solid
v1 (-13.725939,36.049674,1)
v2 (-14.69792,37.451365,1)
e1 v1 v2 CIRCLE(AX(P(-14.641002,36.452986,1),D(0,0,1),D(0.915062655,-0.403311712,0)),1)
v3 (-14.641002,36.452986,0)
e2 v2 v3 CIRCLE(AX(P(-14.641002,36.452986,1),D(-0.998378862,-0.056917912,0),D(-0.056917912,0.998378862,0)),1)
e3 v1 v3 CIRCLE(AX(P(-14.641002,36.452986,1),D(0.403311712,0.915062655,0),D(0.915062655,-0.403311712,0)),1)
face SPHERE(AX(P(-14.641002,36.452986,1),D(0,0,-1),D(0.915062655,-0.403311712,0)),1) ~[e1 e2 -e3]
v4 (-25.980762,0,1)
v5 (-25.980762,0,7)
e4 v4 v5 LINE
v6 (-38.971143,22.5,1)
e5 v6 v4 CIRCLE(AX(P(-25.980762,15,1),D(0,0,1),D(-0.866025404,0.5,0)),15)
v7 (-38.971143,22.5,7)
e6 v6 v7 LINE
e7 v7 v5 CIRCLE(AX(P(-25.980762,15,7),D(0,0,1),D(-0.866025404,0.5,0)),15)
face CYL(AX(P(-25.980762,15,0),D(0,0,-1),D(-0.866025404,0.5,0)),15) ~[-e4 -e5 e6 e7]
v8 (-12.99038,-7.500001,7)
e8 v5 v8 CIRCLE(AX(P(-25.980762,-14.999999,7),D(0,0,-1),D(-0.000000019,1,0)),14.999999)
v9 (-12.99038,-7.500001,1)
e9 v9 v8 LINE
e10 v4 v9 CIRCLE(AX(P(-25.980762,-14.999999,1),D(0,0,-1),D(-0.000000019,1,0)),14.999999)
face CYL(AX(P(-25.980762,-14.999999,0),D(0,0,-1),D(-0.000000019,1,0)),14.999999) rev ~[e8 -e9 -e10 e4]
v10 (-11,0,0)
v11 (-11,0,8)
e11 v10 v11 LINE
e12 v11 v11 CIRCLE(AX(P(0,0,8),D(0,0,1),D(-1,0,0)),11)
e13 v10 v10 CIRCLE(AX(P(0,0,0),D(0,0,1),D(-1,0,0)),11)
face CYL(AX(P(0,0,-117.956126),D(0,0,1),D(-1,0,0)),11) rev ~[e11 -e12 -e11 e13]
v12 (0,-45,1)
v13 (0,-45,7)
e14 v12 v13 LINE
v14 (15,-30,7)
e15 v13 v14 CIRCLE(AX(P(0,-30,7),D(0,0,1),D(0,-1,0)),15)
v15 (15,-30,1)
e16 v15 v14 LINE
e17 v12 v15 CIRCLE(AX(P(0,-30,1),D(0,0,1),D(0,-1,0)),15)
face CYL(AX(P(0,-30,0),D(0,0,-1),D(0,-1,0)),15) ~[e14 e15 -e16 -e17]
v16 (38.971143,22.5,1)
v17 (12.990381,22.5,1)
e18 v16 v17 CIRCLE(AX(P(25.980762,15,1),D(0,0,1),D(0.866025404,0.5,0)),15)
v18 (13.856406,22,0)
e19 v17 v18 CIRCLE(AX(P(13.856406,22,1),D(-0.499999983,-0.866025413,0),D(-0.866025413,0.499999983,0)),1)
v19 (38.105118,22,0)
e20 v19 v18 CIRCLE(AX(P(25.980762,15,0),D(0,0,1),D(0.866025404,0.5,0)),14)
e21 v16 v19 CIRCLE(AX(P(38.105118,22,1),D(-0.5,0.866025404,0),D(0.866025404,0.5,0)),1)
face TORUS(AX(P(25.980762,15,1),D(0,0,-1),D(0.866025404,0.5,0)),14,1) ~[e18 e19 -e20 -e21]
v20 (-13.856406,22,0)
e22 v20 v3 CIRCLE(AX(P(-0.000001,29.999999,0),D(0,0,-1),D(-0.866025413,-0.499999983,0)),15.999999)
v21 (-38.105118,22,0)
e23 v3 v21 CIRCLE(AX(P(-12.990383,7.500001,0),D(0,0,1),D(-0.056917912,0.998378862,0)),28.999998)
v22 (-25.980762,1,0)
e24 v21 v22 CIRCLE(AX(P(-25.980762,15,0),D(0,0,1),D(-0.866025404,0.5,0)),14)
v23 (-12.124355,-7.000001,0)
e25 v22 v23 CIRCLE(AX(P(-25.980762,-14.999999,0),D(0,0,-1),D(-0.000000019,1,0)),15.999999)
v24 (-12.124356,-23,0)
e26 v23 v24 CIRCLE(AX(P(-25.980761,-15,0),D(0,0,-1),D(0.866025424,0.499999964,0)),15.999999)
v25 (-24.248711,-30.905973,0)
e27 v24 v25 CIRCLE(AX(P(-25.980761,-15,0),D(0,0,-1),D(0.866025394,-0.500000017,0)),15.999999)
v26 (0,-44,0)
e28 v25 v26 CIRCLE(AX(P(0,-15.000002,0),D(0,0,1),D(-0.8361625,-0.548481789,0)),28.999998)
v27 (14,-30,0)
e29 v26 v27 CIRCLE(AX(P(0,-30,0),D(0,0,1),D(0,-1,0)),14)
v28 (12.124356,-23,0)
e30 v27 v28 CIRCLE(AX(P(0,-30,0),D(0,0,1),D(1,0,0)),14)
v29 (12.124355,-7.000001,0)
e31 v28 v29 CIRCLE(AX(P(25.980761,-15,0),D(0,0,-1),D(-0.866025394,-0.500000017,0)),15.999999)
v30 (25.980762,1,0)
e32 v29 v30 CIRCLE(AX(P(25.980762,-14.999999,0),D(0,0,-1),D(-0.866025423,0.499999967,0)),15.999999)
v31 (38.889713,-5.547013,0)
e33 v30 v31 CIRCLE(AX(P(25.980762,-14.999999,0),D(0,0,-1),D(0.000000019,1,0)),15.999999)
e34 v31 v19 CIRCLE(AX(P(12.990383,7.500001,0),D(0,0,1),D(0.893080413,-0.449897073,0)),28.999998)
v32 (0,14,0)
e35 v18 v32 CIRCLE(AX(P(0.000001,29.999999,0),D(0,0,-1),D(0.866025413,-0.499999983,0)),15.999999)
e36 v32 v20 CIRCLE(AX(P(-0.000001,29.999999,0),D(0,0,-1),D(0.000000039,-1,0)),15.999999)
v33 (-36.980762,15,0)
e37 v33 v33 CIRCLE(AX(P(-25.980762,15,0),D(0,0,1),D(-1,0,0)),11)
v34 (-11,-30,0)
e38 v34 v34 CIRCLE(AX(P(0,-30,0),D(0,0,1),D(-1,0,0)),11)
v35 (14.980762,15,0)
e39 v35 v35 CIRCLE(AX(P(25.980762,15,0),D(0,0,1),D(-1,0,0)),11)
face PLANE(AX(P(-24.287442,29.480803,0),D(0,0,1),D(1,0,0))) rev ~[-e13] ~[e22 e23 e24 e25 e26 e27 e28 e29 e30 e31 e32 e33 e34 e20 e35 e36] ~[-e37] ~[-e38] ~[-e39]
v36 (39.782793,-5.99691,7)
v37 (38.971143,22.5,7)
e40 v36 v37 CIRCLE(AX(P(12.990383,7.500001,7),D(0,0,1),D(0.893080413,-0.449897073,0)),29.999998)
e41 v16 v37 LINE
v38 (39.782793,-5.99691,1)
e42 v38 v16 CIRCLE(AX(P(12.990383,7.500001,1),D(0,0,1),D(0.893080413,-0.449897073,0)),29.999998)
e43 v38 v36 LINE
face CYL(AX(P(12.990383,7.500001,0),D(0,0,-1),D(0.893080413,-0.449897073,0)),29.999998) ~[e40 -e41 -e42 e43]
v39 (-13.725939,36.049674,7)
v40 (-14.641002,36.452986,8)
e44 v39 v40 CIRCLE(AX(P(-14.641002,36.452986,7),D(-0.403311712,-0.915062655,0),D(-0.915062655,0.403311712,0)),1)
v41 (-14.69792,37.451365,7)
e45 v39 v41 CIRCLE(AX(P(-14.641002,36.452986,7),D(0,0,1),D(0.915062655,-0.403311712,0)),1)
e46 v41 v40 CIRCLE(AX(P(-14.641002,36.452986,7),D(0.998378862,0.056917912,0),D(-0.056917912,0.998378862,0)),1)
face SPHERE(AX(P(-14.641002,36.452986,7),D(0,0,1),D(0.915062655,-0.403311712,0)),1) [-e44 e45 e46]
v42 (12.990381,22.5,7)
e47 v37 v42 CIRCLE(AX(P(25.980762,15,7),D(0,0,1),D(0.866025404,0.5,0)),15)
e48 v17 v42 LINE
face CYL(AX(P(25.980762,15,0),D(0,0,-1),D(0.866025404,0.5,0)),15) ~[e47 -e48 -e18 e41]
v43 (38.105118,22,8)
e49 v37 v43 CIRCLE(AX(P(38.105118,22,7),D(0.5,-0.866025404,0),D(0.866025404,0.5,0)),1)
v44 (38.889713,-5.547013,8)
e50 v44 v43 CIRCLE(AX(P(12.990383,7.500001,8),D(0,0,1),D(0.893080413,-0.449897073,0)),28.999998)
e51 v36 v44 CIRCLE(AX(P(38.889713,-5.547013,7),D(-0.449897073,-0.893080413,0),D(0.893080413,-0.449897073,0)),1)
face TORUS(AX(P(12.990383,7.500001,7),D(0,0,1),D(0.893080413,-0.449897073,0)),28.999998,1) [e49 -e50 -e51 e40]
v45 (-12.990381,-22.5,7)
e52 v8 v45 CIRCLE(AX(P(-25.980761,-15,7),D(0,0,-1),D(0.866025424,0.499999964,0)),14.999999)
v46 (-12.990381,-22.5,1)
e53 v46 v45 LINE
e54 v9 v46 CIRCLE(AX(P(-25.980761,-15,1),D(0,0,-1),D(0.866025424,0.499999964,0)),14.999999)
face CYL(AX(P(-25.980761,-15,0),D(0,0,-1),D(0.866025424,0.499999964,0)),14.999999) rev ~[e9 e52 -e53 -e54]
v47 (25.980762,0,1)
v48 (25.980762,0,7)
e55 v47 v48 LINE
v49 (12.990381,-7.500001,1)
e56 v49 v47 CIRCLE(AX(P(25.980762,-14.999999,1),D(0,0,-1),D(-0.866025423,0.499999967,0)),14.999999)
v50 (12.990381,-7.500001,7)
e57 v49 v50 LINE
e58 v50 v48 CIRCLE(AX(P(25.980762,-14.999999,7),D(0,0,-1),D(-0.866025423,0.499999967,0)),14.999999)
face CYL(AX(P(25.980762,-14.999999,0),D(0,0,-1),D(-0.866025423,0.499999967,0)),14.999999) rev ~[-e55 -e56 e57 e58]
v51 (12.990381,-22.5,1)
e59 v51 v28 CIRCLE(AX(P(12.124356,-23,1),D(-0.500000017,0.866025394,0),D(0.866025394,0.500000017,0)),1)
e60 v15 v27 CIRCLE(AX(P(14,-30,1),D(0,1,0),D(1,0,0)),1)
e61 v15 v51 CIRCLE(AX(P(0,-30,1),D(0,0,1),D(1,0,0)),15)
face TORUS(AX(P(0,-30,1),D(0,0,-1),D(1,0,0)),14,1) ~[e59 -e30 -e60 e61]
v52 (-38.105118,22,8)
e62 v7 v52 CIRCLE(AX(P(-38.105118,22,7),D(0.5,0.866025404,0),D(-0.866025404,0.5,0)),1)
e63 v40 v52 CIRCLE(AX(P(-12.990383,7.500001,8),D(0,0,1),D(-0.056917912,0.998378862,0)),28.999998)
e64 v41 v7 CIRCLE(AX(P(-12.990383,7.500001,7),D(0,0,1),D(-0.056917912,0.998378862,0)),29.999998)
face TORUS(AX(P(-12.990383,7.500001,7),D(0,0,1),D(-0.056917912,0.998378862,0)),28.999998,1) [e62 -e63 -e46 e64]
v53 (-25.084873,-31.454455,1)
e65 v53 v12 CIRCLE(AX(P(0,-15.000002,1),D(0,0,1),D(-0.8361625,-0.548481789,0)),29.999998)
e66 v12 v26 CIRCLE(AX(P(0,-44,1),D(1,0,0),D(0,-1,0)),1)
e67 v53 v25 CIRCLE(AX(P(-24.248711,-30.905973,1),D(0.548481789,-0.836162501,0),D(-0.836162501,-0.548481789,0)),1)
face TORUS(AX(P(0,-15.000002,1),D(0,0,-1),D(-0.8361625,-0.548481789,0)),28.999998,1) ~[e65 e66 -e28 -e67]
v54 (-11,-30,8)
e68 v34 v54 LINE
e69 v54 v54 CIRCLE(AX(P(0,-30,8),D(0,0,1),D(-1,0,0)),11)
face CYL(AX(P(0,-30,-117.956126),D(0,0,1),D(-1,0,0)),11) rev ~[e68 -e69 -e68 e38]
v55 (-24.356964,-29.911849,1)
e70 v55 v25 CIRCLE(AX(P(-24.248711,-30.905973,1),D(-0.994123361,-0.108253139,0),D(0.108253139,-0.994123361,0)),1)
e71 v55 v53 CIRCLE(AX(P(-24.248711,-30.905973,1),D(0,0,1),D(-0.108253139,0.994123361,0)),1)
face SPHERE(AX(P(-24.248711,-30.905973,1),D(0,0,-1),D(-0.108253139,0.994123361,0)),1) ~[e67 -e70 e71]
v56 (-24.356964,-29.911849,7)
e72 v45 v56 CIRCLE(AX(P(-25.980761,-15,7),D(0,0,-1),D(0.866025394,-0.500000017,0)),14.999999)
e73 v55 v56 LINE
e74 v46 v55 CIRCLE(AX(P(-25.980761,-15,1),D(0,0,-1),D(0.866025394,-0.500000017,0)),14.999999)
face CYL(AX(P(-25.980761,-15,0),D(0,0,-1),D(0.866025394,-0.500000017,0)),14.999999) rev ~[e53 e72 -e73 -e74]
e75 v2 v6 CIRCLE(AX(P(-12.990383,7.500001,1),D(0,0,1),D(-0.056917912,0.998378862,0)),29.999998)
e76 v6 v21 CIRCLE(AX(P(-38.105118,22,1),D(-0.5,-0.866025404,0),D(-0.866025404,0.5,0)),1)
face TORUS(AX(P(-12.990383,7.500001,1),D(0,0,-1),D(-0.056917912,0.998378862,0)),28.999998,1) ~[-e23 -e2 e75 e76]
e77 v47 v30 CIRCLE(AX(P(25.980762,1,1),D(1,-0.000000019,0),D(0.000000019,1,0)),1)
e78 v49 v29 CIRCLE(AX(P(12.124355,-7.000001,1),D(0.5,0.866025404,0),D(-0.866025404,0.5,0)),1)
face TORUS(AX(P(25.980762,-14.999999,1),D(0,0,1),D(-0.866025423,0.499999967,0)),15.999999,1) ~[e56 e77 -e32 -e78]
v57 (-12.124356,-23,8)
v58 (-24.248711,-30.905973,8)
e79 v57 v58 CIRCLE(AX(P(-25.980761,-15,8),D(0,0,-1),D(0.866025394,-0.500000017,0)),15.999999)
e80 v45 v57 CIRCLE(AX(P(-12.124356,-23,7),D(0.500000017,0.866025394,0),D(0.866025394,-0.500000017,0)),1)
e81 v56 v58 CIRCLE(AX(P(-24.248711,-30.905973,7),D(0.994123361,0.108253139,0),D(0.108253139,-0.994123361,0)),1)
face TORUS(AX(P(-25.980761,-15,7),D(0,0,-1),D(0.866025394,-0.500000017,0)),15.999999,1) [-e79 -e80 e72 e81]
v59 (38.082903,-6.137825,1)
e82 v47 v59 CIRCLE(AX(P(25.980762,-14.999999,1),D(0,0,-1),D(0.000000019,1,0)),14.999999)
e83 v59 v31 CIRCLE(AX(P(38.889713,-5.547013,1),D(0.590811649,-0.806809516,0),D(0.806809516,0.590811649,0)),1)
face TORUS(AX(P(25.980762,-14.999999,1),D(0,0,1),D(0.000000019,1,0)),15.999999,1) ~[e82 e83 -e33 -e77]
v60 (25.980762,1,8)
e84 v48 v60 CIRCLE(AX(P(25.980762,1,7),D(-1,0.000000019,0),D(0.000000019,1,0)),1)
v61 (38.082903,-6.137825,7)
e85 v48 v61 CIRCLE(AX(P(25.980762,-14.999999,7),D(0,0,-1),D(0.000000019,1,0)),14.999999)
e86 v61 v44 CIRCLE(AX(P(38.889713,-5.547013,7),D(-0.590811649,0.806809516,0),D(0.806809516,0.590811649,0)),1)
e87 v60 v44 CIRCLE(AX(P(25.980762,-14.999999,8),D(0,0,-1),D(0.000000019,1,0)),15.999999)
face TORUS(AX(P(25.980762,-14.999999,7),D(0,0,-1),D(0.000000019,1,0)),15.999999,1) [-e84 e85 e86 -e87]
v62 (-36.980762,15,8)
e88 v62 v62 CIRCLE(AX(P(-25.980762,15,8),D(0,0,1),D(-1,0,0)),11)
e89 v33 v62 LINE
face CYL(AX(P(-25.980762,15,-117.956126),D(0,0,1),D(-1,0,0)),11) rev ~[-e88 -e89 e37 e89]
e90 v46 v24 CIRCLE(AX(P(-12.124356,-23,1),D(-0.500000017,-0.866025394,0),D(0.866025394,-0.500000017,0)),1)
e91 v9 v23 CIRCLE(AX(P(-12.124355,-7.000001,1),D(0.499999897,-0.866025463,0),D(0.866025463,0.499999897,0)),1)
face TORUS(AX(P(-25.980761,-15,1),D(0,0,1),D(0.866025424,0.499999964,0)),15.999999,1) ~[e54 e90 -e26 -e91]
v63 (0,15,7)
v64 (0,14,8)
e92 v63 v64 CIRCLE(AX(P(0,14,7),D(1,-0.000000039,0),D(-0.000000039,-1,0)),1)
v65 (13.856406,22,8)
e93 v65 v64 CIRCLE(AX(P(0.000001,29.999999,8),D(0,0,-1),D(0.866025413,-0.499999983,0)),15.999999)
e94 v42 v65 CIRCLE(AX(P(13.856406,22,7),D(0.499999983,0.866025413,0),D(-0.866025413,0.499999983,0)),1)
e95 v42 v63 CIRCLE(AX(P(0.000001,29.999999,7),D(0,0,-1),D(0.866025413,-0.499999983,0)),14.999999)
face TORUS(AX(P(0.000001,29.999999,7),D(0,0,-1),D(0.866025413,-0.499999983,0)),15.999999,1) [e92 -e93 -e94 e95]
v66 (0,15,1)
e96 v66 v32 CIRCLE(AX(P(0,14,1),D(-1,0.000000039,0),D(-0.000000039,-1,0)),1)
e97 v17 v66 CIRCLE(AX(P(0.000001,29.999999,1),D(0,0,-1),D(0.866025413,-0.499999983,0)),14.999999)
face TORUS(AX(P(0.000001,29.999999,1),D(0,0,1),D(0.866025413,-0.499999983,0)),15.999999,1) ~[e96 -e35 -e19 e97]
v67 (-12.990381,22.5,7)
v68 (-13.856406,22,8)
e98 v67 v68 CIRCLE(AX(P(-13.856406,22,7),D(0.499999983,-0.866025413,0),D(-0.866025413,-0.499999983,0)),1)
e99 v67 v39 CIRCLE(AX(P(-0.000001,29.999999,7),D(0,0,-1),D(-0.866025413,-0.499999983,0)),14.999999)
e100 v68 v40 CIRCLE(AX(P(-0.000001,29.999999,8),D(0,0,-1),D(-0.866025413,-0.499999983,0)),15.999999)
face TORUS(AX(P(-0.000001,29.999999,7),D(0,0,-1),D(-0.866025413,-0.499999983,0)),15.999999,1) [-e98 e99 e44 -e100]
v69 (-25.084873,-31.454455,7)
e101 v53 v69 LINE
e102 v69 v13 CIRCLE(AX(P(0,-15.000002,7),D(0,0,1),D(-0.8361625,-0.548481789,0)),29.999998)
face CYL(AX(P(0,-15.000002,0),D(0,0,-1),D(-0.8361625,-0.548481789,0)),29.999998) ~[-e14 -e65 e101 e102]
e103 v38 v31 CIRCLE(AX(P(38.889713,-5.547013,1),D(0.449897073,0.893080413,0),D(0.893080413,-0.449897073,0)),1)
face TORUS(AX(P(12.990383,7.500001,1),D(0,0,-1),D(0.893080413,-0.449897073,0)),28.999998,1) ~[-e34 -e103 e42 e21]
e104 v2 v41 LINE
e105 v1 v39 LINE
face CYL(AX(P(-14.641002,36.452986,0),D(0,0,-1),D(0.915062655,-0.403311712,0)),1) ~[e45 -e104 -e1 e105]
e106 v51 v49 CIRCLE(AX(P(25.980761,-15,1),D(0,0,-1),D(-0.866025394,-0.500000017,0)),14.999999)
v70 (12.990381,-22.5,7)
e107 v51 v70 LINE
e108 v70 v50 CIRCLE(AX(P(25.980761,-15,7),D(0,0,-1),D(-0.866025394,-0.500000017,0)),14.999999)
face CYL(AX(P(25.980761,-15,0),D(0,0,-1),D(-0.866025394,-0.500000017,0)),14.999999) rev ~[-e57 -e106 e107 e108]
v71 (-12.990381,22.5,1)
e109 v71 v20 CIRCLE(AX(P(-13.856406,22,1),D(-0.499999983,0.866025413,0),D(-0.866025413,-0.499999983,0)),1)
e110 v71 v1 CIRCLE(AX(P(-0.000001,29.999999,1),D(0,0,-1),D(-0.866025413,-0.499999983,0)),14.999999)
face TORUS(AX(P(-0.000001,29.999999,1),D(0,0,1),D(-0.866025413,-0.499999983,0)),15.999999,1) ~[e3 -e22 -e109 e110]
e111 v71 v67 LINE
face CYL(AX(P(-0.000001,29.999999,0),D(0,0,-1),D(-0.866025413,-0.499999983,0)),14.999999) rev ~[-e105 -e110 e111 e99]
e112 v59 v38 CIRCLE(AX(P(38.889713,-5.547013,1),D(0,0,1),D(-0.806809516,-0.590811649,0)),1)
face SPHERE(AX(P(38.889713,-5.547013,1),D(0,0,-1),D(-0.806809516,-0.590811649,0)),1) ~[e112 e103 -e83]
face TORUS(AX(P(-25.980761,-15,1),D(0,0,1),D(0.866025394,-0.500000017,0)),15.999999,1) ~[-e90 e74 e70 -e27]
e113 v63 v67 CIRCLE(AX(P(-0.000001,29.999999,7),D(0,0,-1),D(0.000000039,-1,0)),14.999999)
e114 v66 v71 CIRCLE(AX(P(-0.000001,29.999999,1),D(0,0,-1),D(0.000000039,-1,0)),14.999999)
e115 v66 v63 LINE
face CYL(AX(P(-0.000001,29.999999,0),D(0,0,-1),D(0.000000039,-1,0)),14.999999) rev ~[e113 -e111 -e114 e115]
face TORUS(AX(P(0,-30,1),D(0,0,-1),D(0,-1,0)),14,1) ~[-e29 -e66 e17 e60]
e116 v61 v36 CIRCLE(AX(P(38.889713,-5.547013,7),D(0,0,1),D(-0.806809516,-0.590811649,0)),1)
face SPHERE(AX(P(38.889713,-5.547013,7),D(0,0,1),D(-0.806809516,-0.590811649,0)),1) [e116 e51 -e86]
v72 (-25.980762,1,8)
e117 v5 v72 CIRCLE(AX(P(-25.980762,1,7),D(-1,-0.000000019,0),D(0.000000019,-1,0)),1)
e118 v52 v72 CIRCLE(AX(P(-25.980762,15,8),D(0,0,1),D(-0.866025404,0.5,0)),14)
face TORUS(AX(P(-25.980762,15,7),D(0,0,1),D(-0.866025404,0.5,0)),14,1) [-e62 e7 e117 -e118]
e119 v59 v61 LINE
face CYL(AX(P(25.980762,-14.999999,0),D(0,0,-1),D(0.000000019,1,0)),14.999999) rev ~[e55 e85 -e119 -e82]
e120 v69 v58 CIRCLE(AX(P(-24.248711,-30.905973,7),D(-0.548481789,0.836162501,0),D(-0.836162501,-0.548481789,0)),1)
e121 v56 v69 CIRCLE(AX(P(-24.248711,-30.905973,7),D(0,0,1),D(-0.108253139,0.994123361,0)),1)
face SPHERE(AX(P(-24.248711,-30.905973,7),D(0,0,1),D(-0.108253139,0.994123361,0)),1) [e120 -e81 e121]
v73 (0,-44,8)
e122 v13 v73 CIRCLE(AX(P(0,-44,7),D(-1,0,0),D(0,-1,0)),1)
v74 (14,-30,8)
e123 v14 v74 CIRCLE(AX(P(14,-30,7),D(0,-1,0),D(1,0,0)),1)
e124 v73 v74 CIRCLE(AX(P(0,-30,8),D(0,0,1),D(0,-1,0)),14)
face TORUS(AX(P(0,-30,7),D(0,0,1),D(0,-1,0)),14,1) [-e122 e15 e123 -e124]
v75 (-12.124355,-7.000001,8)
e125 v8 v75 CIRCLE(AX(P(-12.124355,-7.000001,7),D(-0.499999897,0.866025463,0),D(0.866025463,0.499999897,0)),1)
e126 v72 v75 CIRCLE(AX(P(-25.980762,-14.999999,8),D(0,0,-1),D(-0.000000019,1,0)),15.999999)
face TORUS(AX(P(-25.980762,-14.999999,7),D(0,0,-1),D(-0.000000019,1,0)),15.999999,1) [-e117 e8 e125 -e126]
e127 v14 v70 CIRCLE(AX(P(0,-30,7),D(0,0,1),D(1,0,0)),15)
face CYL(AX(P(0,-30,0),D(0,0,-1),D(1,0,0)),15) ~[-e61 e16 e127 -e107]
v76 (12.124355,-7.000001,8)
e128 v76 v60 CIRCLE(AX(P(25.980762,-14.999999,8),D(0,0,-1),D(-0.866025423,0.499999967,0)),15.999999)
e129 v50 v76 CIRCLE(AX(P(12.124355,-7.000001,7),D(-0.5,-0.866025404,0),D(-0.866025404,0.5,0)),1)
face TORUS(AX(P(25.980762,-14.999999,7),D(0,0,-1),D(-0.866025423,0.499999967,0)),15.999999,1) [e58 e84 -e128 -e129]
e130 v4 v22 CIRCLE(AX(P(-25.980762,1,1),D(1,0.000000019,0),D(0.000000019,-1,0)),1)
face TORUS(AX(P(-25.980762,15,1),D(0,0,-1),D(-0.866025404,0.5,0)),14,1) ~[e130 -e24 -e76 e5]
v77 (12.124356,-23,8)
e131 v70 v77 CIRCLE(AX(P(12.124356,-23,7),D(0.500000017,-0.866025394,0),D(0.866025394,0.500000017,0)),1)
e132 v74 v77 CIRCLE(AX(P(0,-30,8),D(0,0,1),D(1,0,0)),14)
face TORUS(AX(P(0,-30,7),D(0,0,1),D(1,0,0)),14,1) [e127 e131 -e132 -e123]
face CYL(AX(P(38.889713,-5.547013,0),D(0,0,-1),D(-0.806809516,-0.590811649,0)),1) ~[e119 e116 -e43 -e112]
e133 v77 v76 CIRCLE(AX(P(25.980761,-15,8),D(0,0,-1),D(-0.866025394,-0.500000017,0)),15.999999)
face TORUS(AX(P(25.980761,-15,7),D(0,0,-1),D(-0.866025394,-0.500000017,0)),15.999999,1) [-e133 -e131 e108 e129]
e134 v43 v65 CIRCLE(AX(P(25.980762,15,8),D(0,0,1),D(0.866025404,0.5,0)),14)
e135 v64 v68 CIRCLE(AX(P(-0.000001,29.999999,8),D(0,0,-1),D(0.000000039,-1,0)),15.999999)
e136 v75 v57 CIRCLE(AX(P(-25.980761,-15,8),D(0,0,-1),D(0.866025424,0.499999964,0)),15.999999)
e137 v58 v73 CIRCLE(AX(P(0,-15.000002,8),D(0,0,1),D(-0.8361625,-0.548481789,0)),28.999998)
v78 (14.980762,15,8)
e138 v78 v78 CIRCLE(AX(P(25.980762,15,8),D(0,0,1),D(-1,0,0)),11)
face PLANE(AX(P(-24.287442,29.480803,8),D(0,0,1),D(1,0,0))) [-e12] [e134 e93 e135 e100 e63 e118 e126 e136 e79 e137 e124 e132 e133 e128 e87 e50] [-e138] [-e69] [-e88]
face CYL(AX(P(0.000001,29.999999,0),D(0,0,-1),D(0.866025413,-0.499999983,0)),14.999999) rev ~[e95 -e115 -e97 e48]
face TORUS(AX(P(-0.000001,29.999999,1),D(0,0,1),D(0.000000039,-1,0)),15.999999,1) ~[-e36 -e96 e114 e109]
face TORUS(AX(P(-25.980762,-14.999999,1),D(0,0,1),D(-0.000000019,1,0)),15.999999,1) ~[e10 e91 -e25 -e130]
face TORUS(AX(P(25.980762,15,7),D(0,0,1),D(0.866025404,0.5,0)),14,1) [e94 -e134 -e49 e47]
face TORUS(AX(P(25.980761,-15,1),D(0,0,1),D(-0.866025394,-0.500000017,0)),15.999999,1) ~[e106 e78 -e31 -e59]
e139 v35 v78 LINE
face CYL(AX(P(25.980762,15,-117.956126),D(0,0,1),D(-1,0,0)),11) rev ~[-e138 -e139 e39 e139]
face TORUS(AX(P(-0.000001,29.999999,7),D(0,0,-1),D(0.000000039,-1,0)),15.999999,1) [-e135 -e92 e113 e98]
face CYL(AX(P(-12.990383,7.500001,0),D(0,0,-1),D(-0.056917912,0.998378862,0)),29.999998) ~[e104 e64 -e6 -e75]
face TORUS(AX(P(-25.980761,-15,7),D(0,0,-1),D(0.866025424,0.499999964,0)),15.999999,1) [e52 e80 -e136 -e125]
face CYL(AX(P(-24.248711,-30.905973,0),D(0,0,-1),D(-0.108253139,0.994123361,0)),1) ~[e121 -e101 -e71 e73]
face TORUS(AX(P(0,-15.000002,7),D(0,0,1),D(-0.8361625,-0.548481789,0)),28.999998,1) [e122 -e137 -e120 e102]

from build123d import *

# Parameters (mm, degrees)
F1_DEPTH = 8
F2_R     = 1
F3_D     = 22


# Not quite as in the source:
# - ends of sketch curves that miss each other by under 0.0002 mm in the source are joined


with BuildPart() as f1:
    # F0 (on Top) → F1 (new body)
    with BuildSketch(Plane.XY):
        with BuildLine():
            ThreePointArc((-38.9711431703, 22.5), (-25.9807619686, 30), (-12.9903809118, 22.4999997489))
            ThreePointArc((-12.9903809118, 22.4999997489), (-14.9779459784, 29.186905207), (-13.7259394882, 36.0496742725))
            ThreePointArc((-13.7259394882, 36.0496742725), (-13.8192435316, 37.0228217364), (-14.6979200558, 37.4513648462))
            ThreePointArc((-14.6979200558, 37.4513648462), (-28.723986457, 33.0431722117), (-38.9711431703, 22.5))
        make_face()
        with BuildLine():
            ThreePointArc((-12.9903809118, -22.4999997489), (-7.4999998907, -17.0096188801), (-3.74e-08, -15))
            ThreePointArc((-3.74e-08, -15), (-7.4999994973, -12.990381347), (-12.9903804576, -7.5000010378))
            ThreePointArc((-12.9903804576, -7.5000010378), (-10.9807619582, -15.0000004542), (-12.9903809118, -22.4999997489))
        make_face()
        with BuildLine():
            ThreePointArc((0, -45), (-12.9903811292, -37.4999998745), (-12.9903809118, -22.4999997489))
            ThreePointArc((-12.9903809118, -22.4999997489), (-17.7876283779, -27.5647343173), (-24.3569639741, -29.9118494238))
            ThreePointArc((-24.3569639741, -29.9118494238), (-25.1530823777, -30.4792268277), (-25.0848733353, -31.4544545742))
            ThreePointArc((-25.0848733353, -31.4544545742), (-14.2542333285, -41.3972880756), (0, -45))
        make_face()
        with BuildLine():
            ThreePointArc((12.9903809118, -22.4999997489), (10.9807619582, -15.000000145), (12.9903807668, -7.5000005022))
            ThreePointArc((12.9903807668, -7.5000005022), (7.4999999838, -12.9903810661), (-3.74e-08, -15))
            ThreePointArc((-3.74e-08, -15), (7.4999998583, -17.0096188614), (12.9903809118, -22.4999997489))
        make_face()
        with BuildLine():
            ThreePointArc((-25.9807618236, 0), (-18.4807613914, -2.0096191808), (-12.9903804576, -7.5000010378))
            ThreePointArc((-12.9903804576, -7.5000010378), (-15, -1.0077e-06), (-12.9903814652, 7.4999992925))
            ThreePointArc((-12.9903814652, 7.4999992925), (-18.4807623417, 2.0096188115), (-25.9807618236, 0))
        make_face()
        with BuildLine():
            ThreePointArc((-3.74e-08, -15), (7.4999999838, -12.9903810661), (12.9903810568, -7.5))
            ThreePointArc((12.9903810568, -7.5), (14.4888873943, -3.8822856765), (15, 0))
            ThreePointArc((15, 0), (14.488887471, 3.8822853903), (12.9903813531, 7.4999994867))
            ThreePointArc((12.9903813531, 7.4999994867), (7.5000002567, 12.9903809086), (0, 15))
            ThreePointArc((0, 15), (-7.5000003538, 12.9903808525), (-12.9903814652, 7.4999992925))
            ThreePointArc((-12.9903814652, 7.4999992925), (-15, -1.0077e-06), (-12.9903804576, -7.5000010378))
            ThreePointArc((-12.9903804576, -7.5000010378), (-7.4999994973, -12.990381347), (-3.74e-08, -15))
        make_face()
        with BuildLine():
            ThreePointArc((-12.9903814652, 7.4999992925), (-7.5000003538, 12.9903808525), (0, 15))
            ThreePointArc((0, 15), (-7.5000002032, 17.0096188812), (-12.9903809118, 22.4999997489))
            ThreePointArc((-12.9903809118, 22.4999997489), (-11.4918746817, 18.8822855365), (-10.9807621135, 15))
            ThreePointArc((-10.9807621135, 15), (-11.4918748249, 11.1177139289), (-12.9903814652, 7.4999992925))
        make_face()
        with BuildLine():
            ThreePointArc((0, 15), (7.5000002567, 12.9903809086), (12.9903813531, 7.4999994867))
            ThreePointArc((12.9903813531, 7.4999994867), (10.9807621135, 14.9999995587), (12.9903809118, 22.4999997489))
            ThreePointArc((12.9903809118, 22.4999997489), (7.5000002032, 17.0096188812), (0, 15))
        make_face()
        with BuildLine():
            ThreePointArc((-25.9807618236, 0), (-18.4807623417, 2.0096188115), (-12.9903814652, 7.4999992925))
            ThreePointArc((-12.9903814652, 7.4999992925), (-11.4918748249, 11.1177139289), (-10.9807621135, 15))
            ThreePointArc((-10.9807621135, 15), (-11.4918746817, 18.8822855365), (-12.9903809118, 22.4999997489))
            ThreePointArc((-12.9903809118, 22.4999997489), (-25.9807619686, 30), (-38.9711431703, 22.5))
            ThreePointArc((-38.9711431703, 22.5), (-38.9711430978, 7.4999998745), (-25.9807618236, 0))
        make_face()
        with BuildLine():
            ThreePointArc((40.9807621135, 15), (36.5873637288, 4.3933981797), (25.9807618236, 0))
            ThreePointArc((25.9807618236, 0), (32.7655743563, -1.6221708897), (38.0829034622, -6.1378248487))
            ThreePointArc((38.0829034622, -6.1378248487), (38.9723259093, -6.5435949088), (39.7827933911, -5.996910272))
            ThreePointArc((39.7827933911, -5.996910272), (42.9782197855, 8.3541158638), (38.9711431703, 22.5))
            ThreePointArc((38.9711431703, 22.5), (40.4696495079, 18.8822856765), (40.9807621135, 15))
        make_face()
        with BuildLine():
            ThreePointArc((12.9903813531, 7.4999994867), (18.4807622447, 2.0096188675), (25.9807618236, 0))
            ThreePointArc((25.9807618236, 0), (36.5873637288, 4.3933981797), (40.9807621135, 15))
            ThreePointArc((40.9807621135, 15), (40.4696495079, 18.8822856765), (38.9711431703, 22.5))
            ThreePointArc((38.9711431703, 22.5), (25.9807619686, 30), (12.9903809118, 22.4999997489))
            ThreePointArc((12.9903809118, 22.4999997489), (10.9807621135, 14.9999995587), (12.9903813531, 7.4999994867))
        make_face()
        with BuildLine():
            ThreePointArc((12.9903809118, -22.4999997489), (7.4999998583, -17.0096188614), (-3.74e-08, -15))
            ThreePointArc((-3.74e-08, -15), (-7.4999998907, -17.0096188801), (-12.9903809118, -22.4999997489))
            ThreePointArc((-12.9903809118, -22.4999997489), (-12.9903811292, -37.4999998745), (0, -45))
            ThreePointArc((0, -45), (10.6066017178, -40.6066017178), (15, -30))
            ThreePointArc((15, -30), (14.4888873568, -26.1177141834), (12.9903809118, -22.4999997489))
        make_face()
        with BuildLine():
            ThreePointArc((15, 0), (14.4888873943, -3.8822856765), (12.9903810568, -7.5))
            ThreePointArc((12.9903810568, -7.5), (18.4807621614, -2.0096187362), (25.9807618236, 0))
            ThreePointArc((25.9807618236, 0), (18.4807622447, 2.0096188675), (12.9903813531, 7.4999994867))
            ThreePointArc((12.9903813531, 7.4999994867), (14.488887471, 3.8822853903), (15, 0))
        make_face()
    extrude(amount=F1_DEPTH)

    # F2
    f2_edges = [f1.edges().sort_by_distance(p)[0] for p in [
        (-38.971143, 7.5, 8),
        (-13.725939, 36.049674, 4),
        (-14.69792, 37.451365, 4),
        (-13.819244, 37.022822, 0),
        (-13.819244, 37.022822, 8),
        (12.990381, -37.5, 8),
        (-38.971143, 22.5, 4),
        (-25.980762, 0, 4),
        (-38.971143, 7.5, 0),
        (-28.723986, 33.043172, 8),
        (-18.480761, -2.009619, 8),
        (-12.602933, -21.784813, 8),
        (-25.153082, -30.479227, 8),
        (-14.254233, -41.397288, 8),
        (10.980762, -15, 8),
        (25.167667, -0.022054, 8),
        (38.972326, -6.543595, 8),
        (42.97822, 8.354116, 8),
        (25.980762, 30, 8),
        (7.5, 17.009619, 8),
        (-12.564735, 21.806866, 8),
        (0, -45, 4),
        (12.990381, -22.5, 4),
        (12.990381, -37.5, 0),
        (38.971143, 22.5, 4),
        (12.990381, 22.5, 4),
        (25.980762, 30, 0),
        (-12.99038, -7.500001, 4),
        (-18.480761, -2.009619, 0),
        (0, 15, 4),
        (-12.564735, 21.806866, 0),
        (12.990381, -7.500001, 4),
        (38.082903, -6.137825, 4),
        (25.167667, -0.022054, 0),
        (-25.084873, -31.454455, 4),
        (-14.254233, -41.397288, 0),
        (-24.356964, -29.911849, 4),
        (-25.153082, -30.479227, 0),
        (39.782793, -5.99691, 4),
        (42.97822, 8.354116, 0),
        (38.972326, -6.543595, 0),
        (-28.723986, 33.043172, 0),
        (-12.602933, -21.784813, 0),
        (10.980762, -15, 0),
        (7.5, 17.009619, 0),
    ]]
    fillet(f2_edges, radius=F2_R)

    # F3 (through all)
    with Locations(Plane(origin=(0, 0, 0), x_dir=(1, 0, 0), z_dir=(0, 0, -1))):
        with Locations((-25.9807621135, -15), (25.9807621135, -15), (0, 0), (0, 30)):
            Hole(F3_D / 2)


solid = f1.part
